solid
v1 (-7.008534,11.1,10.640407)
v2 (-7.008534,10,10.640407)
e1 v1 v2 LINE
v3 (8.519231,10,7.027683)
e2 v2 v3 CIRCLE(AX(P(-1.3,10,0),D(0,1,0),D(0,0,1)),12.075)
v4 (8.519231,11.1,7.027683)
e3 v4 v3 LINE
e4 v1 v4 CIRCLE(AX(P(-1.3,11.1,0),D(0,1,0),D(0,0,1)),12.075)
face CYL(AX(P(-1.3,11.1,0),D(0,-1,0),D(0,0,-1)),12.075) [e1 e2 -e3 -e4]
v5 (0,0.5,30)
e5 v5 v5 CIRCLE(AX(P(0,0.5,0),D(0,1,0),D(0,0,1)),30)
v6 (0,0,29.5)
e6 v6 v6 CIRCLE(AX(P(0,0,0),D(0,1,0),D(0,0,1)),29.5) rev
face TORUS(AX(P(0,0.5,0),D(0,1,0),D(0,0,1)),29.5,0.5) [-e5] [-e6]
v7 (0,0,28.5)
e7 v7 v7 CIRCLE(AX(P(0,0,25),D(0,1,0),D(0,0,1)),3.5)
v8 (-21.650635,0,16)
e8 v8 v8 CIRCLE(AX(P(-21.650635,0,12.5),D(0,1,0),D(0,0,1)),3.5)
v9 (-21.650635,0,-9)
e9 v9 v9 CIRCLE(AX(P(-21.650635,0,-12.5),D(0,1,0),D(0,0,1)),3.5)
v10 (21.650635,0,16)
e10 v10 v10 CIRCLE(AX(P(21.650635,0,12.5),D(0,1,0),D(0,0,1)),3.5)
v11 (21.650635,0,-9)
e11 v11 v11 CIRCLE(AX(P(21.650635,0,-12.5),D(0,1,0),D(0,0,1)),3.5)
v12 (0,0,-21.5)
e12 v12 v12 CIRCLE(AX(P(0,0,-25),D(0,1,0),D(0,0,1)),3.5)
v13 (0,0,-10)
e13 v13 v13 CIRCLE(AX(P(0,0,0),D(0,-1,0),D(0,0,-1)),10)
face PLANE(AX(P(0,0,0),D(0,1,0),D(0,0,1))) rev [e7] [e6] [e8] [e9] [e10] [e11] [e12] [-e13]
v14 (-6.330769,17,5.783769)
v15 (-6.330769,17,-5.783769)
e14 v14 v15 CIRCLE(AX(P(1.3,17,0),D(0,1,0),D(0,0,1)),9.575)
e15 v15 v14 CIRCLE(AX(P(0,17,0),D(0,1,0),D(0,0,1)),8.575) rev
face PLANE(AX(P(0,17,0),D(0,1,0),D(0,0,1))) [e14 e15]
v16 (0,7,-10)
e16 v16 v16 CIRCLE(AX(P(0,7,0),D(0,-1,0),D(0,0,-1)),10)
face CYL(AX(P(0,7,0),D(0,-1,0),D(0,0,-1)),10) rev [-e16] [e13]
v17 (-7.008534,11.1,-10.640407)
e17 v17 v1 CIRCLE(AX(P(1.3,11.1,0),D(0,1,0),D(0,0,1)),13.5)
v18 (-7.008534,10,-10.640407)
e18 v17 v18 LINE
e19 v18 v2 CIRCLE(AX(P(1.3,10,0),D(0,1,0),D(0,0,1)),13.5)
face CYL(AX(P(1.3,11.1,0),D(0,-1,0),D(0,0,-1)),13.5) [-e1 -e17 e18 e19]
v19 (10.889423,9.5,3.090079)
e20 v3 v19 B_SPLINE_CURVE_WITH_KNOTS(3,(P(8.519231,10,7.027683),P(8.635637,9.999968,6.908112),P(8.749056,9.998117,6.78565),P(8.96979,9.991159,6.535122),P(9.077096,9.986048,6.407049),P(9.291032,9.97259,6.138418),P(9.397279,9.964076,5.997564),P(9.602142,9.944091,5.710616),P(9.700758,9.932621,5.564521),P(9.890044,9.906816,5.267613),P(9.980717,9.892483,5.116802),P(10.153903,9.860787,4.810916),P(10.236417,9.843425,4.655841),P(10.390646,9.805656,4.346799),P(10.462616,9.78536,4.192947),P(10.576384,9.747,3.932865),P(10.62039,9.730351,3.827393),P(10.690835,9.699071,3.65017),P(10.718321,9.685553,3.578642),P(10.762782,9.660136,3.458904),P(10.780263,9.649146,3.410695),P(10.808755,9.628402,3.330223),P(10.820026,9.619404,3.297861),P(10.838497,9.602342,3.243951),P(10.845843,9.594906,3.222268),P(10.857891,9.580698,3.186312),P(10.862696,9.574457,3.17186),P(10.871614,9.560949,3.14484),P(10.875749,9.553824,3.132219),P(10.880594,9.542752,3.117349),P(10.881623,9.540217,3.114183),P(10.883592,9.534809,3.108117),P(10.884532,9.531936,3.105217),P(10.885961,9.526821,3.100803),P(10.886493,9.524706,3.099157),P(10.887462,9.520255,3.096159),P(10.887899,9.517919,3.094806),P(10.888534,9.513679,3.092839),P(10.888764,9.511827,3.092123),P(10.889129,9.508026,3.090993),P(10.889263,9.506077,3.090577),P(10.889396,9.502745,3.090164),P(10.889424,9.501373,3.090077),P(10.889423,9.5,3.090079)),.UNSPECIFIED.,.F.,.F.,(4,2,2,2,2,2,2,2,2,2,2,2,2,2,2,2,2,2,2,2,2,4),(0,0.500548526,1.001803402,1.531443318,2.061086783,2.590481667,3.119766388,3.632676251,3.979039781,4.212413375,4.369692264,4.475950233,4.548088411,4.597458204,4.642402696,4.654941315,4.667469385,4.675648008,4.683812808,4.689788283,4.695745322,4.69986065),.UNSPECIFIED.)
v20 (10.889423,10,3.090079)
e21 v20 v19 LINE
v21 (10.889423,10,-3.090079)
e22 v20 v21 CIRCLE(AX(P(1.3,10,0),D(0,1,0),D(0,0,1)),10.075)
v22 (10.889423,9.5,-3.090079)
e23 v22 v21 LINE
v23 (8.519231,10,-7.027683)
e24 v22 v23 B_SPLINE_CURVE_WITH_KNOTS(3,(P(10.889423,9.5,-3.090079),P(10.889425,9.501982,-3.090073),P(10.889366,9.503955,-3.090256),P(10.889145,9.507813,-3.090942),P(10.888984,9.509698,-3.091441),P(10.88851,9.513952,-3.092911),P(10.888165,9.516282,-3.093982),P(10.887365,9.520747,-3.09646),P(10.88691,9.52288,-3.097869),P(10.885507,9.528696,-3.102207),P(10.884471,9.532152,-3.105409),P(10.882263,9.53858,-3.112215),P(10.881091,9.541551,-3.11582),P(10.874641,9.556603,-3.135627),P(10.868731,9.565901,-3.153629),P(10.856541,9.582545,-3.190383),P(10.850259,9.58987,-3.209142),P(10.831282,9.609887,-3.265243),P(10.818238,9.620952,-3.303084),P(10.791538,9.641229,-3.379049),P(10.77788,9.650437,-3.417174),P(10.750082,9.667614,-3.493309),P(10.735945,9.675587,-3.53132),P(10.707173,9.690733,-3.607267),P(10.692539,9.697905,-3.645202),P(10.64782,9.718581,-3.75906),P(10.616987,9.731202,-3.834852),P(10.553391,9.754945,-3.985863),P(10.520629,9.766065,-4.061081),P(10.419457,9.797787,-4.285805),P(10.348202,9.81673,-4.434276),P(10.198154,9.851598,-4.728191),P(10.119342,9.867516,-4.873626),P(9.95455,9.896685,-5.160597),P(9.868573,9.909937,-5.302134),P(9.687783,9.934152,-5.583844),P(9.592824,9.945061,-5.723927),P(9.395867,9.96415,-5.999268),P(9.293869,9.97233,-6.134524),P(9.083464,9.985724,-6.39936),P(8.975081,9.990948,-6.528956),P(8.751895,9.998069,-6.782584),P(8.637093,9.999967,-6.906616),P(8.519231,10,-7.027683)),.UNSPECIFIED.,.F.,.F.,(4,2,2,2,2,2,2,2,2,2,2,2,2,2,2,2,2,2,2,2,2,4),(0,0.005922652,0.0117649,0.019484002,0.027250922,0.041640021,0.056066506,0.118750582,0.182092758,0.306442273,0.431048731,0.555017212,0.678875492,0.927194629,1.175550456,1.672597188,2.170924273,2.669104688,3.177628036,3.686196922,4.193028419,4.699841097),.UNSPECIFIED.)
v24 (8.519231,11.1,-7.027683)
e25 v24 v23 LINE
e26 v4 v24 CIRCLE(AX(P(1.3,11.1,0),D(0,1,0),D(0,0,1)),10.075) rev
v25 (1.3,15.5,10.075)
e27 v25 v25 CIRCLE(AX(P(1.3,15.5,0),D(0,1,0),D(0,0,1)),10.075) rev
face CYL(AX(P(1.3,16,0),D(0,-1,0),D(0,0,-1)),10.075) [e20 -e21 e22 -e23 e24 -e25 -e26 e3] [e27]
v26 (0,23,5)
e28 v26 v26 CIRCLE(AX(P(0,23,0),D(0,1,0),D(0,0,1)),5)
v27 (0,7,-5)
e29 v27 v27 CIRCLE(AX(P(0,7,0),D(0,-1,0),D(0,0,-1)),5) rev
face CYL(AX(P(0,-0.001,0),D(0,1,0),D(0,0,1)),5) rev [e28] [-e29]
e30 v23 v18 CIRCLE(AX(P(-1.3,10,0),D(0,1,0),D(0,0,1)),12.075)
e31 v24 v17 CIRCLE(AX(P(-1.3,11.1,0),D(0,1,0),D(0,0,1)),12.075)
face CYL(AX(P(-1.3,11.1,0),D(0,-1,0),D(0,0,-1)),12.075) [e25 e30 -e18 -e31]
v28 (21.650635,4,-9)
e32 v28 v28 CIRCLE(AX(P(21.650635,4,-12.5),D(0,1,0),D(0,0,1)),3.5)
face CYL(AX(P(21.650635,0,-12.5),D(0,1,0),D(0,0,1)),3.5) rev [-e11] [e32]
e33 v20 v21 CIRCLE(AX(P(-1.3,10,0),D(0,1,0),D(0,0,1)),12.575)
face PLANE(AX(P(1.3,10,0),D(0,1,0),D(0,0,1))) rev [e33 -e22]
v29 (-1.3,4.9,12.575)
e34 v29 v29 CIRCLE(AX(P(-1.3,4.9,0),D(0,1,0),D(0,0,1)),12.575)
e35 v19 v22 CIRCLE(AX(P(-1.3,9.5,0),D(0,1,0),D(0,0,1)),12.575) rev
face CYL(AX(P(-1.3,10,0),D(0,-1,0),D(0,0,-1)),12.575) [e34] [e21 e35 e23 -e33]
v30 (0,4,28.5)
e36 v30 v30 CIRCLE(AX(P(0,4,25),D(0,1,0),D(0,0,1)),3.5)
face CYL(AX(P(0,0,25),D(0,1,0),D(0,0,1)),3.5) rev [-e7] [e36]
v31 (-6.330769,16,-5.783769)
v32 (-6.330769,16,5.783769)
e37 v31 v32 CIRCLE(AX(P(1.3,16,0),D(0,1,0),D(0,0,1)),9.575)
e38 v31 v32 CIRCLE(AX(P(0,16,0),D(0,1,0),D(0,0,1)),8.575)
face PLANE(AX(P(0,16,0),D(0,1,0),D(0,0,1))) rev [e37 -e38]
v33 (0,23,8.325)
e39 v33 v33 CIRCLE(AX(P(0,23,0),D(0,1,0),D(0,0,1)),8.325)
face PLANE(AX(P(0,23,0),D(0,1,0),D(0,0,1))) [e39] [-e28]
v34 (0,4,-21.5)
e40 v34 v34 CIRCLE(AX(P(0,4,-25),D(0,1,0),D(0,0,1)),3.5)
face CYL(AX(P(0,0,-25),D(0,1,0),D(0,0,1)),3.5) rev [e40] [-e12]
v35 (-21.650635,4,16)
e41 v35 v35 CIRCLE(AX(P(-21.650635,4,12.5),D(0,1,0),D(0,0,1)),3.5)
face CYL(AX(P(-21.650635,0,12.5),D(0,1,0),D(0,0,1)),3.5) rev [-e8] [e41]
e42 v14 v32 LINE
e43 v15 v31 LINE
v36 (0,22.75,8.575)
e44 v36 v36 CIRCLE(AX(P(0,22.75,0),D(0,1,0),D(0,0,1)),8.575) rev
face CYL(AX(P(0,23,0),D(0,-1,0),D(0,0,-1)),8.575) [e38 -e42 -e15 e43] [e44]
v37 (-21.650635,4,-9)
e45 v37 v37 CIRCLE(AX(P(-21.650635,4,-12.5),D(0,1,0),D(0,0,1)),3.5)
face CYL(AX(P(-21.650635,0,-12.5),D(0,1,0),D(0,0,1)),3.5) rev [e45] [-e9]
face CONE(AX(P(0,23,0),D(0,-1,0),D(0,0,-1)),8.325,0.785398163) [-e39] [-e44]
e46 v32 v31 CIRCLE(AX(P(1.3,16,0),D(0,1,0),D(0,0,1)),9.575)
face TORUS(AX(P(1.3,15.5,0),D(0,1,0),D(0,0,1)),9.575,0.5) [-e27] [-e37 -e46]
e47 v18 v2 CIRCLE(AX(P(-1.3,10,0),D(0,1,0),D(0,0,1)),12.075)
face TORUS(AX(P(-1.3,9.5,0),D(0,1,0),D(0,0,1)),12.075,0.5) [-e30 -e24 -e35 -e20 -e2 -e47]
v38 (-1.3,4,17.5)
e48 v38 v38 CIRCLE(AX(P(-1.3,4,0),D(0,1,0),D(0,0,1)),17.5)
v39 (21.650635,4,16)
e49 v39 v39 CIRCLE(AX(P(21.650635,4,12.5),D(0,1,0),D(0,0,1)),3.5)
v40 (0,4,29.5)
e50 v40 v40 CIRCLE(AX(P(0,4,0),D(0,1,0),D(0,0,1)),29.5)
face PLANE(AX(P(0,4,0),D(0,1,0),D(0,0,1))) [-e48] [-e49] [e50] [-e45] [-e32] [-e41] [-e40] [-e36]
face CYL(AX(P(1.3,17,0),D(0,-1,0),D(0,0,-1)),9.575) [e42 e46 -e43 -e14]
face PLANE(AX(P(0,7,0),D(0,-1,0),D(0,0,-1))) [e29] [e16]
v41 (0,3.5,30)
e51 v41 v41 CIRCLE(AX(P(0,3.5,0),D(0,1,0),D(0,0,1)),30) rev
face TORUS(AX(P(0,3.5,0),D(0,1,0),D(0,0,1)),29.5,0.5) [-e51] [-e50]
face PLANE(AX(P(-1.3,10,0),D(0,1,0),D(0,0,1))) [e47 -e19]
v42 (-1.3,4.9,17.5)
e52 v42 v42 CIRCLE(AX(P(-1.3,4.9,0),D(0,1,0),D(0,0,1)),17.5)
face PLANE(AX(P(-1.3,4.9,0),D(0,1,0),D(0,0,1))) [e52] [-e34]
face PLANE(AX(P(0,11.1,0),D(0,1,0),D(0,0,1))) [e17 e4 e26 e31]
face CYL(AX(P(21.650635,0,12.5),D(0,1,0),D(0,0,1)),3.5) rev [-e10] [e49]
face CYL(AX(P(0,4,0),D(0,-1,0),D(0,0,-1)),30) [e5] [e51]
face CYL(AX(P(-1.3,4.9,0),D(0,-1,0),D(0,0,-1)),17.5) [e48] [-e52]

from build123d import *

# Parameters (mm, degrees)
SKETCH1_R           = 30
SKETCH1_R_2         = 2.05
BOSS_EXTRUDE1_DEPTH = 4
SKETCH2_R           = 12.575
BOSS_EXTRUDE2_DEPTH = 6
SKETCH3_R           = 10.075
BOSS_EXTRUDE3_DEPTH = 6
FILLET1_R           = 0.5
SKETCH4_R           = 3.5
CUT_EXTRUDE1_DEPTH  = 4
SKETCH5_R           = 8.575
BOSS_EXTRUDE4_DEPTH = 7
SKETCH6_R           = 17.5
SKETCH6_R_2         = 12.575
BOSS_EXTRUDE5_DEPTH = 0.9
BOSS_EXTRUDE6_DEPTH = 1.1
CHAMFER1_SIZE       = 0.25
BOSS_EXTRUDE7_DEPTH = 1
CUT_EXTRUDE2_REACH  = 50.26
SKETCH9_R           = 5
SKETCH10_R          = 10
CUT_EXTRUDE3_DEPTH  = 7


with BuildPart() as part:
    # Sketch1 → Boss-Extrude1 (new body)
    with BuildSketch(Plane(origin=(0, 0, 0), x_dir=(1, 0, 0), z_dir=(0, 1, 0))):
        Circle(SKETCH1_R)
        with Locations((0, 25)):
            Circle(SKETCH1_R_2, mode=Mode.SUBTRACT)
        with Locations((21.650635095, 12.5)):
            Circle(SKETCH1_R_2, mode=Mode.SUBTRACT)
        with Locations((21.650635095, -12.5)):
            Circle(SKETCH1_R_2, mode=Mode.SUBTRACT)
        with Locations((0, -25)):
            Circle(SKETCH1_R_2, mode=Mode.SUBTRACT)
        with Locations((-21.650635095, -12.5)):
            Circle(SKETCH1_R_2, mode=Mode.SUBTRACT)
        with Locations((-21.650635095, 12.5)):
            Circle(SKETCH1_R_2, mode=Mode.SUBTRACT)
    extrude(amount=BOSS_EXTRUDE1_DEPTH)

    # Sketch2 → Boss-Extrude2 (add)
    with BuildSketch(Plane(origin=(0, 4, 0), x_dir=(1, 0, 0), z_dir=(0, 1, 0))):
        with Locations((-1.3, 0)):
            Circle(SKETCH2_R)
    extrude(amount=BOSS_EXTRUDE2_DEPTH)

    # Sketch3 → Boss-Extrude3 (add)
    with BuildSketch(Plane(origin=(0, 10, 0), x_dir=(1, 0, 0), z_dir=(0, 1, 0))):
        with Locations((1.3, 0)):
            Circle(SKETCH3_R)
    extrude(amount=BOSS_EXTRUDE3_DEPTH)

    # Fillet1
    fillet1_edges = [part.edges().sort_by_distance(p)[0] for p in [
        (-8.775, 16, 0),
        (-13.875, 10, 0),
        (-30, 0, 0),
        (-30, 4, 0),
    ]]
    fillet(fillet1_edges, radius=FILLET1_R)

    # Sketch4 → Cut-Extrude1 (cut)
    with BuildSketch(Plane(origin=(0, 4, 0), x_dir=(1, 0, 0), z_dir=(0, 1, 0))):
        with Locations((0, 25)):
            Circle(SKETCH4_R)
        with Locations((21.650635095, 12.5)):
            Circle(SKETCH4_R)
        with Locations((21.650635095, -12.5)):
            Circle(SKETCH4_R)
        with Locations((0, -25)):
            Circle(SKETCH4_R)
        with Locations((-21.650635095, -12.5)):
            Circle(SKETCH4_R)
        with Locations((-21.650635095, 12.5)):
            Circle(SKETCH4_R)
    extrude(amount=-CUT_EXTRUDE1_DEPTH, mode=Mode.SUBTRACT)

    # Sketch5 → Boss-Extrude4 (add)
    with BuildSketch(Plane(origin=(0, 16, 0), x_dir=(1, 0, 0), z_dir=(0, 1, 0))):
        Circle(SKETCH5_R)
    extrude(amount=BOSS_EXTRUDE4_DEPTH)

    # Sketch6 → Boss-Extrude5 (add)
    with BuildSketch(Plane(origin=(0, 4, 0), x_dir=(1, 0, 0), z_dir=(0, 1, 0))):
        with Locations((-1.3, 0)):
            Circle(SKETCH6_R)
        with Locations((-1.3, 0)):
            Circle(SKETCH6_R_2, mode=Mode.SUBTRACT)
    extrude(amount=BOSS_EXTRUDE5_DEPTH)

    # Sketch7 → Boss-Extrude6 (add)
    with BuildSketch(Plane(origin=(0, 10, 0), x_dir=(1, 0, 0), z_dir=(0, 1, 0))):
        with BuildLine():
            ThreePointArc((8.519230769, -7.027683267), (-8.775, 0), (8.519230769, 7.027683267))
            ThreePointArc((8.519230769, 7.027683267), (1.436311663, 11.760876816), (-7.008533654, 10.640407348))
            ThreePointArc((-7.008533654, 10.640407348), (-12.2, 0), (-7.008533654, -10.640407348))
            ThreePointArc((-7.008533654, -10.640407348), (1.436311663, -11.760876816), (8.519230769, -7.027683267))
        make_face()
    extrude(amount=BOSS_EXTRUDE6_DEPTH)

    # Chamfer1
    chamfer1_edges = [part.edges().sort_by_distance(p)[0] for p in [
        (-8.575, 23, 0),
    ]]
    chamfer(chamfer1_edges, length=CHAMFER1_SIZE)

    # Sketch8 → Boss-Extrude7 (add)
    with BuildSketch(Plane(origin=(0, 16, 0), x_dir=(1, 0, 0), z_dir=(0, 1, 0))):
        with BuildLine():
            ThreePointArc((-6.330769231, 5.783769182), (3.101957354, 7.994278302), (8.575, 0))
            ThreePointArc((8.575, 0), (3.101957354, -7.994278302), (-6.330769231, -5.783769182))
            ThreePointArc((-6.330769231, -5.783769182), (10.875, 0), (-6.330769231, 5.783769182))
        make_face()
    extrude(amount=BOSS_EXTRUDE7_DEPTH)

    # Sketch9 → Cut-Extrude2 (cut, up to next)
    with BuildSketch(Plane(origin=(0, 23, 0), x_dir=(1, 0, 0), z_dir=(0, 1, 0)), mode=Mode.PRIVATE) as cut_extrude2_sk1:
        Circle(SKETCH9_R)
    cut_extrude2_tool1 = extrude(cut_extrude2_sk1.sketch, amount=-CUT_EXTRUDE2_REACH, mode=Mode.PRIVATE) & part.part
    add(cut_extrude2_tool1.solids().sort_by_distance((0, 23, 0))[0], mode=Mode.SUBTRACT)

    # Sketch10 → Cut-Extrude3 (cut)
    with BuildSketch(Plane.XZ):
        Circle(SKETCH10_R)
    extrude(amount=-CUT_EXTRUDE3_DEPTH, mode=Mode.SUBTRACT)


solid = part.part
